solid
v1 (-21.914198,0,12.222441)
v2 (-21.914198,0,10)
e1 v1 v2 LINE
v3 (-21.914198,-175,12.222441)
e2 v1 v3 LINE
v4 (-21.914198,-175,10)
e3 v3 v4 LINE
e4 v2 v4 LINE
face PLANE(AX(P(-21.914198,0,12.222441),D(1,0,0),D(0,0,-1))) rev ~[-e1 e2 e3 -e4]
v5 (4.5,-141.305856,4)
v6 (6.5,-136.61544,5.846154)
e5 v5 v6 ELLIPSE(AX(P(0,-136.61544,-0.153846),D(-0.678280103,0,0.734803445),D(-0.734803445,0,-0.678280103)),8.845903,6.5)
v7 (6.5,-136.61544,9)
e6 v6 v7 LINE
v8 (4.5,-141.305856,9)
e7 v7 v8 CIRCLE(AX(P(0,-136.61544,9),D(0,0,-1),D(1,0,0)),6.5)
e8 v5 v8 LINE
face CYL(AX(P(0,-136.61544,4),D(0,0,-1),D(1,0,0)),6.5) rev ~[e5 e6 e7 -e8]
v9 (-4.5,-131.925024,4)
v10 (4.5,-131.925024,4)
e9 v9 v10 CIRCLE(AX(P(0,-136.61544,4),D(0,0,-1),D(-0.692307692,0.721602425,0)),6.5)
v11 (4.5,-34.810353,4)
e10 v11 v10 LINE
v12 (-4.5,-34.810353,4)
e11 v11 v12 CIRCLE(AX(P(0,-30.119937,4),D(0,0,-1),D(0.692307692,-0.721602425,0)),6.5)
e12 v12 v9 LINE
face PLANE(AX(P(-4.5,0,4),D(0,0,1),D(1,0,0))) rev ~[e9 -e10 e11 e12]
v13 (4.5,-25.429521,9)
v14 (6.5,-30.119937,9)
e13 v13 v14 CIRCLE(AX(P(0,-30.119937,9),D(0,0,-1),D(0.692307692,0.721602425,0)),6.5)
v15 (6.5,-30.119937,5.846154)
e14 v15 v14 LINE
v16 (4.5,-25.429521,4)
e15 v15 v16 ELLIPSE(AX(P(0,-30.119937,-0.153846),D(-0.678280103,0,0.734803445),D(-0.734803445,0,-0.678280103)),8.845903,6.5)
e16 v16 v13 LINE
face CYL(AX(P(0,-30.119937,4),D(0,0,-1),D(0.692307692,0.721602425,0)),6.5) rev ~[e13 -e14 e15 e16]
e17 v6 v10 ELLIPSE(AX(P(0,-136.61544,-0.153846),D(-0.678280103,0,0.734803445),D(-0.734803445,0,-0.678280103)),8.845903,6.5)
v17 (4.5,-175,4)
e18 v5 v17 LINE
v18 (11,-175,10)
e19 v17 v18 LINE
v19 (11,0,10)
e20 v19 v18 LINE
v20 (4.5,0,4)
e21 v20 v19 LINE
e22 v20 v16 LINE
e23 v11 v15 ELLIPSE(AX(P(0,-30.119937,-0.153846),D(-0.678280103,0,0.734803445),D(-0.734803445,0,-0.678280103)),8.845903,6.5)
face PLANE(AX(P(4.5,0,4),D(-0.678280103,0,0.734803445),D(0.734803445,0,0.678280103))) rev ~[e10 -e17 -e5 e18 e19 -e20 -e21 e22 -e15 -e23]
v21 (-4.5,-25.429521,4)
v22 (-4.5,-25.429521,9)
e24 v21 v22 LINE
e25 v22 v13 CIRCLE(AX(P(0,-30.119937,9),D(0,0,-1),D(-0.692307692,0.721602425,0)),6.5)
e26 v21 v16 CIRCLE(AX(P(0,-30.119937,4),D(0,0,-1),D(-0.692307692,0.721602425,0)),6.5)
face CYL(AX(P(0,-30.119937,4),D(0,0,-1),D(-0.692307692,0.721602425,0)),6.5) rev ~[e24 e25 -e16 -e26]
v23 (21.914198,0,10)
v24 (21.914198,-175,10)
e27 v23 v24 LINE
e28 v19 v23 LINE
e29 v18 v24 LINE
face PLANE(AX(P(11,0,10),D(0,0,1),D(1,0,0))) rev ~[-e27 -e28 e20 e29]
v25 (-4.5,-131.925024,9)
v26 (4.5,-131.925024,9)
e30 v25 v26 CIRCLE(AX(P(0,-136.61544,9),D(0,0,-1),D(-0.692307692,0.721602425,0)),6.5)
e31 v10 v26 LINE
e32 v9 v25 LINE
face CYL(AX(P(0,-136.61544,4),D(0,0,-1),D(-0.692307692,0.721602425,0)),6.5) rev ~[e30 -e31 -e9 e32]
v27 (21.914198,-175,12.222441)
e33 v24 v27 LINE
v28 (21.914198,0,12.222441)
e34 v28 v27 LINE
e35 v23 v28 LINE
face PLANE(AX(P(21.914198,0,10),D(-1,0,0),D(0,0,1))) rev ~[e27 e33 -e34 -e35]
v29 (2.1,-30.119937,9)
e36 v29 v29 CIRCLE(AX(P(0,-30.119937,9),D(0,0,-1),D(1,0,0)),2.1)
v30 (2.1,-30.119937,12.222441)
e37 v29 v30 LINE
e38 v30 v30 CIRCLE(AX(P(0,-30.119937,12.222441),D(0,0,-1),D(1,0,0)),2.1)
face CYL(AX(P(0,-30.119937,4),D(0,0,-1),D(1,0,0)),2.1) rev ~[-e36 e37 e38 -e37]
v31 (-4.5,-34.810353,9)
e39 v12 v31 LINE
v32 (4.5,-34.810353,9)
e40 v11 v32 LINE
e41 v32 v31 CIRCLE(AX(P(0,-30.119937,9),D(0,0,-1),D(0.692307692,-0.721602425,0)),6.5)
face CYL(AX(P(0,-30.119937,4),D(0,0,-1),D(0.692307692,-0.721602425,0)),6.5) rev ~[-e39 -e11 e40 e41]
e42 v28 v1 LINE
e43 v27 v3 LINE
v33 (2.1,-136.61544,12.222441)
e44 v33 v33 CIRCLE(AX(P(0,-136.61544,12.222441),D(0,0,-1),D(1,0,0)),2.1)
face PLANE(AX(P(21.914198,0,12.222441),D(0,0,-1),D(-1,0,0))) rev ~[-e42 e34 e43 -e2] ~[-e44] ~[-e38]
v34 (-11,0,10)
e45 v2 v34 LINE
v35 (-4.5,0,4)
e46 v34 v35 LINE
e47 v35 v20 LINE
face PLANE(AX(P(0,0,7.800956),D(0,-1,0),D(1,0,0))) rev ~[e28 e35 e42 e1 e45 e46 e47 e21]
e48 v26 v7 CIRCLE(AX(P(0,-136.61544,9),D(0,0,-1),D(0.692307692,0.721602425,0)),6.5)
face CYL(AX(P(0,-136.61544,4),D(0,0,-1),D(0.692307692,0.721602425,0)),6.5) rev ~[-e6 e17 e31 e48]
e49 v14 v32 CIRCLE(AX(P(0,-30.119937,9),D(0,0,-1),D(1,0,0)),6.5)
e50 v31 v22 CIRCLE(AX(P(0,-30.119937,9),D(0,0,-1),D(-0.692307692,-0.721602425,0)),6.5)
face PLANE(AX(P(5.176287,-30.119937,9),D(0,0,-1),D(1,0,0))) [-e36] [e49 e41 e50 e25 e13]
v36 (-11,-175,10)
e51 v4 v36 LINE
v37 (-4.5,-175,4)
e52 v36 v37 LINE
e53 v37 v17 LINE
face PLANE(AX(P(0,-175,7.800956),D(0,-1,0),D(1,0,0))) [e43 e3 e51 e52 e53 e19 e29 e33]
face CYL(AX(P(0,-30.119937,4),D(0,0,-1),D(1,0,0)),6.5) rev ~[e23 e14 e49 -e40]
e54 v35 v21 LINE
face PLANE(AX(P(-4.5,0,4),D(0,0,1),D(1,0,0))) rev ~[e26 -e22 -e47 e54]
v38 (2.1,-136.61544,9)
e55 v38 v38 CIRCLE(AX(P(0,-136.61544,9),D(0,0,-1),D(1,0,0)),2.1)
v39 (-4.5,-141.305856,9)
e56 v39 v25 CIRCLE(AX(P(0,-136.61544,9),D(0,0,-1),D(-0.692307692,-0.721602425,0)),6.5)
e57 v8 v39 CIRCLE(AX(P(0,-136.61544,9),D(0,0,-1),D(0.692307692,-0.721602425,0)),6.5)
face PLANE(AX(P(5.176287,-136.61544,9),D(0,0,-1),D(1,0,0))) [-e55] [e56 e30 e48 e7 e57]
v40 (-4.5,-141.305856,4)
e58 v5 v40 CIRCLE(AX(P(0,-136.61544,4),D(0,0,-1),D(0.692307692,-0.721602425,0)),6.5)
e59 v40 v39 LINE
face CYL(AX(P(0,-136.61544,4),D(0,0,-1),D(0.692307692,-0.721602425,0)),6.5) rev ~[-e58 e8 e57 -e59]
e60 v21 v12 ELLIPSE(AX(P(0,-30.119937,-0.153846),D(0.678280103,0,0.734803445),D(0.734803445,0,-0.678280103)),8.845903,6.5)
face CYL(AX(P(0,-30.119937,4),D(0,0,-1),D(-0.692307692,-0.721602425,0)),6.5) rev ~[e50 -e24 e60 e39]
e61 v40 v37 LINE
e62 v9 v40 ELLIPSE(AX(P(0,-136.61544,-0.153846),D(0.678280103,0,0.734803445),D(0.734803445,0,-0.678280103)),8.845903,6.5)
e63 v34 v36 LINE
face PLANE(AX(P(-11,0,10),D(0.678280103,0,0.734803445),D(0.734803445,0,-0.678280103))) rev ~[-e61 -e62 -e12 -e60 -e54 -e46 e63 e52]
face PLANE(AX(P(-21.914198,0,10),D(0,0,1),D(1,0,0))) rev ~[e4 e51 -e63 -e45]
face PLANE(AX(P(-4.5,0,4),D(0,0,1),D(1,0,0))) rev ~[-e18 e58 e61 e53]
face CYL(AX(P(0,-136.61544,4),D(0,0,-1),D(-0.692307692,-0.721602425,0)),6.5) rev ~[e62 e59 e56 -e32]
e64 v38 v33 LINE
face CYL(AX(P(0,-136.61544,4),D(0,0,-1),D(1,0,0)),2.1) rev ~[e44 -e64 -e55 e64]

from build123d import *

# Parameters (mm, degrees)
F1_DEPTH = 175
F2_R     = 2.1
F3_DEPTH = 25
F4_DEPTH = 25
F5_DEPTH = 5
F6_DEPTH = 5


with BuildPart() as f1:
    # F0 (on Front) → F1 (new body)
    with BuildSketch(Plane.XZ):
        Polygon((4.5, 4), (11, 10), (-11, 10), (-4.5, 4), (0, 4), align=None)
        Polygon((11, 10), (21.9141976312, 10), (21.9141976312, 12.2224409133), (-21.9141976312, 12.2224409133), (-21.9141976312, 10), (-11, 10), align=None)
    extrude(amount=F1_DEPTH)

    # F2 (on face) → F3 (cut)
    with BuildSketch(Plane(origin=(0, 0, 4), x_dir=(1, 0, 0), z_dir=(0, 0, -1))):
        with Locations((0, 136.6154402494)):
            Circle(F2_R)
    extrude(amount=-F3_DEPTH, mode=Mode.SUBTRACT)

    # F2 (on face) → F4 (cut)
    with BuildSketch(Plane(origin=(0, 0, 4), x_dir=(1, 0, 0), z_dir=(0, 0, -1))):
        with Locations((0, 30.1199369133)):
            Circle(F2_R)
    extrude(amount=-F4_DEPTH, mode=Mode.SUBTRACT)

    # F2 (on face) → F5 (cut)
    with BuildSketch(Plane(origin=(0, 0, 4), x_dir=(1, 0, 0), z_dir=(0, 0, -1))):
        with BuildLine():
            ThreePointArc((4.5, 25.4295211534), (5.9791303716, 27.5704271565), (6.5, 30.1199369133))
            ThreePointArc((6.5, 30.1199369133), (5.9791303716, 32.66944667), (4.5, 34.8103526731))
            Line((4.5, 34.8103526731), (4.5, 25.4295211534))
        make_face()
        with BuildLine():
            Line((4.5, 25.4295211534), (4.5, 34.8103526731))
            ThreePointArc((4.5, 34.8103526731), (0, 36.6199369133), (-4.5, 34.8103526731))
            Line((-4.5, 34.8103526731), (-4.5, 25.4295211534))
            ThreePointArc((-4.5, 25.4295211534), (0, 23.6199369133), (4.5, 25.4295211534))
        make_face()
        with Locations((0, 30.1199369133)):
            Circle(F2_R, mode=Mode.SUBTRACT)
        with BuildLine():
            Line((-4.5, 25.4295211534), (-4.5, 34.8103526731))
            ThreePointArc((-4.5, 34.8103526731), (-6.5, 30.1199369133), (-4.5, 25.4295211534))
        make_face()
        with BuildLine():
            Line((4.5, 141.3058560093), (4.5, 131.9250244896))
            ThreePointArc((4.5, 131.9250244896), (5.9791303716, 134.0659304926), (6.5, 136.6154402494))
            ThreePointArc((6.5, 136.6154402494), (5.9791303716, 139.1649500062), (4.5, 141.3058560093))
        make_face()
    extrude(amount=-F5_DEPTH, mode=Mode.SUBTRACT)

    # F2 (on face) → F6 (cut)
    with BuildSketch(Plane(origin=(0, 0, 4), x_dir=(1, 0, 0), z_dir=(0, 0, -1))):
        with BuildLine():
            ThreePointArc((-4.5, 141.3058560093), (-6.5, 136.6154402494), (-4.5, 131.9250244896))
            Line((-4.5, 131.9250244896), (-4.5, 141.3058560093))
        make_face()
        with BuildLine():
            ThreePointArc((-4.5, 131.9250244896), (0, 130.1154402494), (4.5, 131.9250244896))
            Line((4.5, 131.9250244896), (4.5, 141.3058560093))
            ThreePointArc((4.5, 141.3058560093), (0, 143.1154402494), (-4.5, 141.3058560093))
            Line((-4.5, 141.3058560093), (-4.5, 131.9250244896))
        make_face()
        with Locations((0, 136.6154402494)):
            Circle(F2_R, mode=Mode.SUBTRACT)
    extrude(amount=-F6_DEPTH, mode=Mode.SUBTRACT)


solid = f1.part
